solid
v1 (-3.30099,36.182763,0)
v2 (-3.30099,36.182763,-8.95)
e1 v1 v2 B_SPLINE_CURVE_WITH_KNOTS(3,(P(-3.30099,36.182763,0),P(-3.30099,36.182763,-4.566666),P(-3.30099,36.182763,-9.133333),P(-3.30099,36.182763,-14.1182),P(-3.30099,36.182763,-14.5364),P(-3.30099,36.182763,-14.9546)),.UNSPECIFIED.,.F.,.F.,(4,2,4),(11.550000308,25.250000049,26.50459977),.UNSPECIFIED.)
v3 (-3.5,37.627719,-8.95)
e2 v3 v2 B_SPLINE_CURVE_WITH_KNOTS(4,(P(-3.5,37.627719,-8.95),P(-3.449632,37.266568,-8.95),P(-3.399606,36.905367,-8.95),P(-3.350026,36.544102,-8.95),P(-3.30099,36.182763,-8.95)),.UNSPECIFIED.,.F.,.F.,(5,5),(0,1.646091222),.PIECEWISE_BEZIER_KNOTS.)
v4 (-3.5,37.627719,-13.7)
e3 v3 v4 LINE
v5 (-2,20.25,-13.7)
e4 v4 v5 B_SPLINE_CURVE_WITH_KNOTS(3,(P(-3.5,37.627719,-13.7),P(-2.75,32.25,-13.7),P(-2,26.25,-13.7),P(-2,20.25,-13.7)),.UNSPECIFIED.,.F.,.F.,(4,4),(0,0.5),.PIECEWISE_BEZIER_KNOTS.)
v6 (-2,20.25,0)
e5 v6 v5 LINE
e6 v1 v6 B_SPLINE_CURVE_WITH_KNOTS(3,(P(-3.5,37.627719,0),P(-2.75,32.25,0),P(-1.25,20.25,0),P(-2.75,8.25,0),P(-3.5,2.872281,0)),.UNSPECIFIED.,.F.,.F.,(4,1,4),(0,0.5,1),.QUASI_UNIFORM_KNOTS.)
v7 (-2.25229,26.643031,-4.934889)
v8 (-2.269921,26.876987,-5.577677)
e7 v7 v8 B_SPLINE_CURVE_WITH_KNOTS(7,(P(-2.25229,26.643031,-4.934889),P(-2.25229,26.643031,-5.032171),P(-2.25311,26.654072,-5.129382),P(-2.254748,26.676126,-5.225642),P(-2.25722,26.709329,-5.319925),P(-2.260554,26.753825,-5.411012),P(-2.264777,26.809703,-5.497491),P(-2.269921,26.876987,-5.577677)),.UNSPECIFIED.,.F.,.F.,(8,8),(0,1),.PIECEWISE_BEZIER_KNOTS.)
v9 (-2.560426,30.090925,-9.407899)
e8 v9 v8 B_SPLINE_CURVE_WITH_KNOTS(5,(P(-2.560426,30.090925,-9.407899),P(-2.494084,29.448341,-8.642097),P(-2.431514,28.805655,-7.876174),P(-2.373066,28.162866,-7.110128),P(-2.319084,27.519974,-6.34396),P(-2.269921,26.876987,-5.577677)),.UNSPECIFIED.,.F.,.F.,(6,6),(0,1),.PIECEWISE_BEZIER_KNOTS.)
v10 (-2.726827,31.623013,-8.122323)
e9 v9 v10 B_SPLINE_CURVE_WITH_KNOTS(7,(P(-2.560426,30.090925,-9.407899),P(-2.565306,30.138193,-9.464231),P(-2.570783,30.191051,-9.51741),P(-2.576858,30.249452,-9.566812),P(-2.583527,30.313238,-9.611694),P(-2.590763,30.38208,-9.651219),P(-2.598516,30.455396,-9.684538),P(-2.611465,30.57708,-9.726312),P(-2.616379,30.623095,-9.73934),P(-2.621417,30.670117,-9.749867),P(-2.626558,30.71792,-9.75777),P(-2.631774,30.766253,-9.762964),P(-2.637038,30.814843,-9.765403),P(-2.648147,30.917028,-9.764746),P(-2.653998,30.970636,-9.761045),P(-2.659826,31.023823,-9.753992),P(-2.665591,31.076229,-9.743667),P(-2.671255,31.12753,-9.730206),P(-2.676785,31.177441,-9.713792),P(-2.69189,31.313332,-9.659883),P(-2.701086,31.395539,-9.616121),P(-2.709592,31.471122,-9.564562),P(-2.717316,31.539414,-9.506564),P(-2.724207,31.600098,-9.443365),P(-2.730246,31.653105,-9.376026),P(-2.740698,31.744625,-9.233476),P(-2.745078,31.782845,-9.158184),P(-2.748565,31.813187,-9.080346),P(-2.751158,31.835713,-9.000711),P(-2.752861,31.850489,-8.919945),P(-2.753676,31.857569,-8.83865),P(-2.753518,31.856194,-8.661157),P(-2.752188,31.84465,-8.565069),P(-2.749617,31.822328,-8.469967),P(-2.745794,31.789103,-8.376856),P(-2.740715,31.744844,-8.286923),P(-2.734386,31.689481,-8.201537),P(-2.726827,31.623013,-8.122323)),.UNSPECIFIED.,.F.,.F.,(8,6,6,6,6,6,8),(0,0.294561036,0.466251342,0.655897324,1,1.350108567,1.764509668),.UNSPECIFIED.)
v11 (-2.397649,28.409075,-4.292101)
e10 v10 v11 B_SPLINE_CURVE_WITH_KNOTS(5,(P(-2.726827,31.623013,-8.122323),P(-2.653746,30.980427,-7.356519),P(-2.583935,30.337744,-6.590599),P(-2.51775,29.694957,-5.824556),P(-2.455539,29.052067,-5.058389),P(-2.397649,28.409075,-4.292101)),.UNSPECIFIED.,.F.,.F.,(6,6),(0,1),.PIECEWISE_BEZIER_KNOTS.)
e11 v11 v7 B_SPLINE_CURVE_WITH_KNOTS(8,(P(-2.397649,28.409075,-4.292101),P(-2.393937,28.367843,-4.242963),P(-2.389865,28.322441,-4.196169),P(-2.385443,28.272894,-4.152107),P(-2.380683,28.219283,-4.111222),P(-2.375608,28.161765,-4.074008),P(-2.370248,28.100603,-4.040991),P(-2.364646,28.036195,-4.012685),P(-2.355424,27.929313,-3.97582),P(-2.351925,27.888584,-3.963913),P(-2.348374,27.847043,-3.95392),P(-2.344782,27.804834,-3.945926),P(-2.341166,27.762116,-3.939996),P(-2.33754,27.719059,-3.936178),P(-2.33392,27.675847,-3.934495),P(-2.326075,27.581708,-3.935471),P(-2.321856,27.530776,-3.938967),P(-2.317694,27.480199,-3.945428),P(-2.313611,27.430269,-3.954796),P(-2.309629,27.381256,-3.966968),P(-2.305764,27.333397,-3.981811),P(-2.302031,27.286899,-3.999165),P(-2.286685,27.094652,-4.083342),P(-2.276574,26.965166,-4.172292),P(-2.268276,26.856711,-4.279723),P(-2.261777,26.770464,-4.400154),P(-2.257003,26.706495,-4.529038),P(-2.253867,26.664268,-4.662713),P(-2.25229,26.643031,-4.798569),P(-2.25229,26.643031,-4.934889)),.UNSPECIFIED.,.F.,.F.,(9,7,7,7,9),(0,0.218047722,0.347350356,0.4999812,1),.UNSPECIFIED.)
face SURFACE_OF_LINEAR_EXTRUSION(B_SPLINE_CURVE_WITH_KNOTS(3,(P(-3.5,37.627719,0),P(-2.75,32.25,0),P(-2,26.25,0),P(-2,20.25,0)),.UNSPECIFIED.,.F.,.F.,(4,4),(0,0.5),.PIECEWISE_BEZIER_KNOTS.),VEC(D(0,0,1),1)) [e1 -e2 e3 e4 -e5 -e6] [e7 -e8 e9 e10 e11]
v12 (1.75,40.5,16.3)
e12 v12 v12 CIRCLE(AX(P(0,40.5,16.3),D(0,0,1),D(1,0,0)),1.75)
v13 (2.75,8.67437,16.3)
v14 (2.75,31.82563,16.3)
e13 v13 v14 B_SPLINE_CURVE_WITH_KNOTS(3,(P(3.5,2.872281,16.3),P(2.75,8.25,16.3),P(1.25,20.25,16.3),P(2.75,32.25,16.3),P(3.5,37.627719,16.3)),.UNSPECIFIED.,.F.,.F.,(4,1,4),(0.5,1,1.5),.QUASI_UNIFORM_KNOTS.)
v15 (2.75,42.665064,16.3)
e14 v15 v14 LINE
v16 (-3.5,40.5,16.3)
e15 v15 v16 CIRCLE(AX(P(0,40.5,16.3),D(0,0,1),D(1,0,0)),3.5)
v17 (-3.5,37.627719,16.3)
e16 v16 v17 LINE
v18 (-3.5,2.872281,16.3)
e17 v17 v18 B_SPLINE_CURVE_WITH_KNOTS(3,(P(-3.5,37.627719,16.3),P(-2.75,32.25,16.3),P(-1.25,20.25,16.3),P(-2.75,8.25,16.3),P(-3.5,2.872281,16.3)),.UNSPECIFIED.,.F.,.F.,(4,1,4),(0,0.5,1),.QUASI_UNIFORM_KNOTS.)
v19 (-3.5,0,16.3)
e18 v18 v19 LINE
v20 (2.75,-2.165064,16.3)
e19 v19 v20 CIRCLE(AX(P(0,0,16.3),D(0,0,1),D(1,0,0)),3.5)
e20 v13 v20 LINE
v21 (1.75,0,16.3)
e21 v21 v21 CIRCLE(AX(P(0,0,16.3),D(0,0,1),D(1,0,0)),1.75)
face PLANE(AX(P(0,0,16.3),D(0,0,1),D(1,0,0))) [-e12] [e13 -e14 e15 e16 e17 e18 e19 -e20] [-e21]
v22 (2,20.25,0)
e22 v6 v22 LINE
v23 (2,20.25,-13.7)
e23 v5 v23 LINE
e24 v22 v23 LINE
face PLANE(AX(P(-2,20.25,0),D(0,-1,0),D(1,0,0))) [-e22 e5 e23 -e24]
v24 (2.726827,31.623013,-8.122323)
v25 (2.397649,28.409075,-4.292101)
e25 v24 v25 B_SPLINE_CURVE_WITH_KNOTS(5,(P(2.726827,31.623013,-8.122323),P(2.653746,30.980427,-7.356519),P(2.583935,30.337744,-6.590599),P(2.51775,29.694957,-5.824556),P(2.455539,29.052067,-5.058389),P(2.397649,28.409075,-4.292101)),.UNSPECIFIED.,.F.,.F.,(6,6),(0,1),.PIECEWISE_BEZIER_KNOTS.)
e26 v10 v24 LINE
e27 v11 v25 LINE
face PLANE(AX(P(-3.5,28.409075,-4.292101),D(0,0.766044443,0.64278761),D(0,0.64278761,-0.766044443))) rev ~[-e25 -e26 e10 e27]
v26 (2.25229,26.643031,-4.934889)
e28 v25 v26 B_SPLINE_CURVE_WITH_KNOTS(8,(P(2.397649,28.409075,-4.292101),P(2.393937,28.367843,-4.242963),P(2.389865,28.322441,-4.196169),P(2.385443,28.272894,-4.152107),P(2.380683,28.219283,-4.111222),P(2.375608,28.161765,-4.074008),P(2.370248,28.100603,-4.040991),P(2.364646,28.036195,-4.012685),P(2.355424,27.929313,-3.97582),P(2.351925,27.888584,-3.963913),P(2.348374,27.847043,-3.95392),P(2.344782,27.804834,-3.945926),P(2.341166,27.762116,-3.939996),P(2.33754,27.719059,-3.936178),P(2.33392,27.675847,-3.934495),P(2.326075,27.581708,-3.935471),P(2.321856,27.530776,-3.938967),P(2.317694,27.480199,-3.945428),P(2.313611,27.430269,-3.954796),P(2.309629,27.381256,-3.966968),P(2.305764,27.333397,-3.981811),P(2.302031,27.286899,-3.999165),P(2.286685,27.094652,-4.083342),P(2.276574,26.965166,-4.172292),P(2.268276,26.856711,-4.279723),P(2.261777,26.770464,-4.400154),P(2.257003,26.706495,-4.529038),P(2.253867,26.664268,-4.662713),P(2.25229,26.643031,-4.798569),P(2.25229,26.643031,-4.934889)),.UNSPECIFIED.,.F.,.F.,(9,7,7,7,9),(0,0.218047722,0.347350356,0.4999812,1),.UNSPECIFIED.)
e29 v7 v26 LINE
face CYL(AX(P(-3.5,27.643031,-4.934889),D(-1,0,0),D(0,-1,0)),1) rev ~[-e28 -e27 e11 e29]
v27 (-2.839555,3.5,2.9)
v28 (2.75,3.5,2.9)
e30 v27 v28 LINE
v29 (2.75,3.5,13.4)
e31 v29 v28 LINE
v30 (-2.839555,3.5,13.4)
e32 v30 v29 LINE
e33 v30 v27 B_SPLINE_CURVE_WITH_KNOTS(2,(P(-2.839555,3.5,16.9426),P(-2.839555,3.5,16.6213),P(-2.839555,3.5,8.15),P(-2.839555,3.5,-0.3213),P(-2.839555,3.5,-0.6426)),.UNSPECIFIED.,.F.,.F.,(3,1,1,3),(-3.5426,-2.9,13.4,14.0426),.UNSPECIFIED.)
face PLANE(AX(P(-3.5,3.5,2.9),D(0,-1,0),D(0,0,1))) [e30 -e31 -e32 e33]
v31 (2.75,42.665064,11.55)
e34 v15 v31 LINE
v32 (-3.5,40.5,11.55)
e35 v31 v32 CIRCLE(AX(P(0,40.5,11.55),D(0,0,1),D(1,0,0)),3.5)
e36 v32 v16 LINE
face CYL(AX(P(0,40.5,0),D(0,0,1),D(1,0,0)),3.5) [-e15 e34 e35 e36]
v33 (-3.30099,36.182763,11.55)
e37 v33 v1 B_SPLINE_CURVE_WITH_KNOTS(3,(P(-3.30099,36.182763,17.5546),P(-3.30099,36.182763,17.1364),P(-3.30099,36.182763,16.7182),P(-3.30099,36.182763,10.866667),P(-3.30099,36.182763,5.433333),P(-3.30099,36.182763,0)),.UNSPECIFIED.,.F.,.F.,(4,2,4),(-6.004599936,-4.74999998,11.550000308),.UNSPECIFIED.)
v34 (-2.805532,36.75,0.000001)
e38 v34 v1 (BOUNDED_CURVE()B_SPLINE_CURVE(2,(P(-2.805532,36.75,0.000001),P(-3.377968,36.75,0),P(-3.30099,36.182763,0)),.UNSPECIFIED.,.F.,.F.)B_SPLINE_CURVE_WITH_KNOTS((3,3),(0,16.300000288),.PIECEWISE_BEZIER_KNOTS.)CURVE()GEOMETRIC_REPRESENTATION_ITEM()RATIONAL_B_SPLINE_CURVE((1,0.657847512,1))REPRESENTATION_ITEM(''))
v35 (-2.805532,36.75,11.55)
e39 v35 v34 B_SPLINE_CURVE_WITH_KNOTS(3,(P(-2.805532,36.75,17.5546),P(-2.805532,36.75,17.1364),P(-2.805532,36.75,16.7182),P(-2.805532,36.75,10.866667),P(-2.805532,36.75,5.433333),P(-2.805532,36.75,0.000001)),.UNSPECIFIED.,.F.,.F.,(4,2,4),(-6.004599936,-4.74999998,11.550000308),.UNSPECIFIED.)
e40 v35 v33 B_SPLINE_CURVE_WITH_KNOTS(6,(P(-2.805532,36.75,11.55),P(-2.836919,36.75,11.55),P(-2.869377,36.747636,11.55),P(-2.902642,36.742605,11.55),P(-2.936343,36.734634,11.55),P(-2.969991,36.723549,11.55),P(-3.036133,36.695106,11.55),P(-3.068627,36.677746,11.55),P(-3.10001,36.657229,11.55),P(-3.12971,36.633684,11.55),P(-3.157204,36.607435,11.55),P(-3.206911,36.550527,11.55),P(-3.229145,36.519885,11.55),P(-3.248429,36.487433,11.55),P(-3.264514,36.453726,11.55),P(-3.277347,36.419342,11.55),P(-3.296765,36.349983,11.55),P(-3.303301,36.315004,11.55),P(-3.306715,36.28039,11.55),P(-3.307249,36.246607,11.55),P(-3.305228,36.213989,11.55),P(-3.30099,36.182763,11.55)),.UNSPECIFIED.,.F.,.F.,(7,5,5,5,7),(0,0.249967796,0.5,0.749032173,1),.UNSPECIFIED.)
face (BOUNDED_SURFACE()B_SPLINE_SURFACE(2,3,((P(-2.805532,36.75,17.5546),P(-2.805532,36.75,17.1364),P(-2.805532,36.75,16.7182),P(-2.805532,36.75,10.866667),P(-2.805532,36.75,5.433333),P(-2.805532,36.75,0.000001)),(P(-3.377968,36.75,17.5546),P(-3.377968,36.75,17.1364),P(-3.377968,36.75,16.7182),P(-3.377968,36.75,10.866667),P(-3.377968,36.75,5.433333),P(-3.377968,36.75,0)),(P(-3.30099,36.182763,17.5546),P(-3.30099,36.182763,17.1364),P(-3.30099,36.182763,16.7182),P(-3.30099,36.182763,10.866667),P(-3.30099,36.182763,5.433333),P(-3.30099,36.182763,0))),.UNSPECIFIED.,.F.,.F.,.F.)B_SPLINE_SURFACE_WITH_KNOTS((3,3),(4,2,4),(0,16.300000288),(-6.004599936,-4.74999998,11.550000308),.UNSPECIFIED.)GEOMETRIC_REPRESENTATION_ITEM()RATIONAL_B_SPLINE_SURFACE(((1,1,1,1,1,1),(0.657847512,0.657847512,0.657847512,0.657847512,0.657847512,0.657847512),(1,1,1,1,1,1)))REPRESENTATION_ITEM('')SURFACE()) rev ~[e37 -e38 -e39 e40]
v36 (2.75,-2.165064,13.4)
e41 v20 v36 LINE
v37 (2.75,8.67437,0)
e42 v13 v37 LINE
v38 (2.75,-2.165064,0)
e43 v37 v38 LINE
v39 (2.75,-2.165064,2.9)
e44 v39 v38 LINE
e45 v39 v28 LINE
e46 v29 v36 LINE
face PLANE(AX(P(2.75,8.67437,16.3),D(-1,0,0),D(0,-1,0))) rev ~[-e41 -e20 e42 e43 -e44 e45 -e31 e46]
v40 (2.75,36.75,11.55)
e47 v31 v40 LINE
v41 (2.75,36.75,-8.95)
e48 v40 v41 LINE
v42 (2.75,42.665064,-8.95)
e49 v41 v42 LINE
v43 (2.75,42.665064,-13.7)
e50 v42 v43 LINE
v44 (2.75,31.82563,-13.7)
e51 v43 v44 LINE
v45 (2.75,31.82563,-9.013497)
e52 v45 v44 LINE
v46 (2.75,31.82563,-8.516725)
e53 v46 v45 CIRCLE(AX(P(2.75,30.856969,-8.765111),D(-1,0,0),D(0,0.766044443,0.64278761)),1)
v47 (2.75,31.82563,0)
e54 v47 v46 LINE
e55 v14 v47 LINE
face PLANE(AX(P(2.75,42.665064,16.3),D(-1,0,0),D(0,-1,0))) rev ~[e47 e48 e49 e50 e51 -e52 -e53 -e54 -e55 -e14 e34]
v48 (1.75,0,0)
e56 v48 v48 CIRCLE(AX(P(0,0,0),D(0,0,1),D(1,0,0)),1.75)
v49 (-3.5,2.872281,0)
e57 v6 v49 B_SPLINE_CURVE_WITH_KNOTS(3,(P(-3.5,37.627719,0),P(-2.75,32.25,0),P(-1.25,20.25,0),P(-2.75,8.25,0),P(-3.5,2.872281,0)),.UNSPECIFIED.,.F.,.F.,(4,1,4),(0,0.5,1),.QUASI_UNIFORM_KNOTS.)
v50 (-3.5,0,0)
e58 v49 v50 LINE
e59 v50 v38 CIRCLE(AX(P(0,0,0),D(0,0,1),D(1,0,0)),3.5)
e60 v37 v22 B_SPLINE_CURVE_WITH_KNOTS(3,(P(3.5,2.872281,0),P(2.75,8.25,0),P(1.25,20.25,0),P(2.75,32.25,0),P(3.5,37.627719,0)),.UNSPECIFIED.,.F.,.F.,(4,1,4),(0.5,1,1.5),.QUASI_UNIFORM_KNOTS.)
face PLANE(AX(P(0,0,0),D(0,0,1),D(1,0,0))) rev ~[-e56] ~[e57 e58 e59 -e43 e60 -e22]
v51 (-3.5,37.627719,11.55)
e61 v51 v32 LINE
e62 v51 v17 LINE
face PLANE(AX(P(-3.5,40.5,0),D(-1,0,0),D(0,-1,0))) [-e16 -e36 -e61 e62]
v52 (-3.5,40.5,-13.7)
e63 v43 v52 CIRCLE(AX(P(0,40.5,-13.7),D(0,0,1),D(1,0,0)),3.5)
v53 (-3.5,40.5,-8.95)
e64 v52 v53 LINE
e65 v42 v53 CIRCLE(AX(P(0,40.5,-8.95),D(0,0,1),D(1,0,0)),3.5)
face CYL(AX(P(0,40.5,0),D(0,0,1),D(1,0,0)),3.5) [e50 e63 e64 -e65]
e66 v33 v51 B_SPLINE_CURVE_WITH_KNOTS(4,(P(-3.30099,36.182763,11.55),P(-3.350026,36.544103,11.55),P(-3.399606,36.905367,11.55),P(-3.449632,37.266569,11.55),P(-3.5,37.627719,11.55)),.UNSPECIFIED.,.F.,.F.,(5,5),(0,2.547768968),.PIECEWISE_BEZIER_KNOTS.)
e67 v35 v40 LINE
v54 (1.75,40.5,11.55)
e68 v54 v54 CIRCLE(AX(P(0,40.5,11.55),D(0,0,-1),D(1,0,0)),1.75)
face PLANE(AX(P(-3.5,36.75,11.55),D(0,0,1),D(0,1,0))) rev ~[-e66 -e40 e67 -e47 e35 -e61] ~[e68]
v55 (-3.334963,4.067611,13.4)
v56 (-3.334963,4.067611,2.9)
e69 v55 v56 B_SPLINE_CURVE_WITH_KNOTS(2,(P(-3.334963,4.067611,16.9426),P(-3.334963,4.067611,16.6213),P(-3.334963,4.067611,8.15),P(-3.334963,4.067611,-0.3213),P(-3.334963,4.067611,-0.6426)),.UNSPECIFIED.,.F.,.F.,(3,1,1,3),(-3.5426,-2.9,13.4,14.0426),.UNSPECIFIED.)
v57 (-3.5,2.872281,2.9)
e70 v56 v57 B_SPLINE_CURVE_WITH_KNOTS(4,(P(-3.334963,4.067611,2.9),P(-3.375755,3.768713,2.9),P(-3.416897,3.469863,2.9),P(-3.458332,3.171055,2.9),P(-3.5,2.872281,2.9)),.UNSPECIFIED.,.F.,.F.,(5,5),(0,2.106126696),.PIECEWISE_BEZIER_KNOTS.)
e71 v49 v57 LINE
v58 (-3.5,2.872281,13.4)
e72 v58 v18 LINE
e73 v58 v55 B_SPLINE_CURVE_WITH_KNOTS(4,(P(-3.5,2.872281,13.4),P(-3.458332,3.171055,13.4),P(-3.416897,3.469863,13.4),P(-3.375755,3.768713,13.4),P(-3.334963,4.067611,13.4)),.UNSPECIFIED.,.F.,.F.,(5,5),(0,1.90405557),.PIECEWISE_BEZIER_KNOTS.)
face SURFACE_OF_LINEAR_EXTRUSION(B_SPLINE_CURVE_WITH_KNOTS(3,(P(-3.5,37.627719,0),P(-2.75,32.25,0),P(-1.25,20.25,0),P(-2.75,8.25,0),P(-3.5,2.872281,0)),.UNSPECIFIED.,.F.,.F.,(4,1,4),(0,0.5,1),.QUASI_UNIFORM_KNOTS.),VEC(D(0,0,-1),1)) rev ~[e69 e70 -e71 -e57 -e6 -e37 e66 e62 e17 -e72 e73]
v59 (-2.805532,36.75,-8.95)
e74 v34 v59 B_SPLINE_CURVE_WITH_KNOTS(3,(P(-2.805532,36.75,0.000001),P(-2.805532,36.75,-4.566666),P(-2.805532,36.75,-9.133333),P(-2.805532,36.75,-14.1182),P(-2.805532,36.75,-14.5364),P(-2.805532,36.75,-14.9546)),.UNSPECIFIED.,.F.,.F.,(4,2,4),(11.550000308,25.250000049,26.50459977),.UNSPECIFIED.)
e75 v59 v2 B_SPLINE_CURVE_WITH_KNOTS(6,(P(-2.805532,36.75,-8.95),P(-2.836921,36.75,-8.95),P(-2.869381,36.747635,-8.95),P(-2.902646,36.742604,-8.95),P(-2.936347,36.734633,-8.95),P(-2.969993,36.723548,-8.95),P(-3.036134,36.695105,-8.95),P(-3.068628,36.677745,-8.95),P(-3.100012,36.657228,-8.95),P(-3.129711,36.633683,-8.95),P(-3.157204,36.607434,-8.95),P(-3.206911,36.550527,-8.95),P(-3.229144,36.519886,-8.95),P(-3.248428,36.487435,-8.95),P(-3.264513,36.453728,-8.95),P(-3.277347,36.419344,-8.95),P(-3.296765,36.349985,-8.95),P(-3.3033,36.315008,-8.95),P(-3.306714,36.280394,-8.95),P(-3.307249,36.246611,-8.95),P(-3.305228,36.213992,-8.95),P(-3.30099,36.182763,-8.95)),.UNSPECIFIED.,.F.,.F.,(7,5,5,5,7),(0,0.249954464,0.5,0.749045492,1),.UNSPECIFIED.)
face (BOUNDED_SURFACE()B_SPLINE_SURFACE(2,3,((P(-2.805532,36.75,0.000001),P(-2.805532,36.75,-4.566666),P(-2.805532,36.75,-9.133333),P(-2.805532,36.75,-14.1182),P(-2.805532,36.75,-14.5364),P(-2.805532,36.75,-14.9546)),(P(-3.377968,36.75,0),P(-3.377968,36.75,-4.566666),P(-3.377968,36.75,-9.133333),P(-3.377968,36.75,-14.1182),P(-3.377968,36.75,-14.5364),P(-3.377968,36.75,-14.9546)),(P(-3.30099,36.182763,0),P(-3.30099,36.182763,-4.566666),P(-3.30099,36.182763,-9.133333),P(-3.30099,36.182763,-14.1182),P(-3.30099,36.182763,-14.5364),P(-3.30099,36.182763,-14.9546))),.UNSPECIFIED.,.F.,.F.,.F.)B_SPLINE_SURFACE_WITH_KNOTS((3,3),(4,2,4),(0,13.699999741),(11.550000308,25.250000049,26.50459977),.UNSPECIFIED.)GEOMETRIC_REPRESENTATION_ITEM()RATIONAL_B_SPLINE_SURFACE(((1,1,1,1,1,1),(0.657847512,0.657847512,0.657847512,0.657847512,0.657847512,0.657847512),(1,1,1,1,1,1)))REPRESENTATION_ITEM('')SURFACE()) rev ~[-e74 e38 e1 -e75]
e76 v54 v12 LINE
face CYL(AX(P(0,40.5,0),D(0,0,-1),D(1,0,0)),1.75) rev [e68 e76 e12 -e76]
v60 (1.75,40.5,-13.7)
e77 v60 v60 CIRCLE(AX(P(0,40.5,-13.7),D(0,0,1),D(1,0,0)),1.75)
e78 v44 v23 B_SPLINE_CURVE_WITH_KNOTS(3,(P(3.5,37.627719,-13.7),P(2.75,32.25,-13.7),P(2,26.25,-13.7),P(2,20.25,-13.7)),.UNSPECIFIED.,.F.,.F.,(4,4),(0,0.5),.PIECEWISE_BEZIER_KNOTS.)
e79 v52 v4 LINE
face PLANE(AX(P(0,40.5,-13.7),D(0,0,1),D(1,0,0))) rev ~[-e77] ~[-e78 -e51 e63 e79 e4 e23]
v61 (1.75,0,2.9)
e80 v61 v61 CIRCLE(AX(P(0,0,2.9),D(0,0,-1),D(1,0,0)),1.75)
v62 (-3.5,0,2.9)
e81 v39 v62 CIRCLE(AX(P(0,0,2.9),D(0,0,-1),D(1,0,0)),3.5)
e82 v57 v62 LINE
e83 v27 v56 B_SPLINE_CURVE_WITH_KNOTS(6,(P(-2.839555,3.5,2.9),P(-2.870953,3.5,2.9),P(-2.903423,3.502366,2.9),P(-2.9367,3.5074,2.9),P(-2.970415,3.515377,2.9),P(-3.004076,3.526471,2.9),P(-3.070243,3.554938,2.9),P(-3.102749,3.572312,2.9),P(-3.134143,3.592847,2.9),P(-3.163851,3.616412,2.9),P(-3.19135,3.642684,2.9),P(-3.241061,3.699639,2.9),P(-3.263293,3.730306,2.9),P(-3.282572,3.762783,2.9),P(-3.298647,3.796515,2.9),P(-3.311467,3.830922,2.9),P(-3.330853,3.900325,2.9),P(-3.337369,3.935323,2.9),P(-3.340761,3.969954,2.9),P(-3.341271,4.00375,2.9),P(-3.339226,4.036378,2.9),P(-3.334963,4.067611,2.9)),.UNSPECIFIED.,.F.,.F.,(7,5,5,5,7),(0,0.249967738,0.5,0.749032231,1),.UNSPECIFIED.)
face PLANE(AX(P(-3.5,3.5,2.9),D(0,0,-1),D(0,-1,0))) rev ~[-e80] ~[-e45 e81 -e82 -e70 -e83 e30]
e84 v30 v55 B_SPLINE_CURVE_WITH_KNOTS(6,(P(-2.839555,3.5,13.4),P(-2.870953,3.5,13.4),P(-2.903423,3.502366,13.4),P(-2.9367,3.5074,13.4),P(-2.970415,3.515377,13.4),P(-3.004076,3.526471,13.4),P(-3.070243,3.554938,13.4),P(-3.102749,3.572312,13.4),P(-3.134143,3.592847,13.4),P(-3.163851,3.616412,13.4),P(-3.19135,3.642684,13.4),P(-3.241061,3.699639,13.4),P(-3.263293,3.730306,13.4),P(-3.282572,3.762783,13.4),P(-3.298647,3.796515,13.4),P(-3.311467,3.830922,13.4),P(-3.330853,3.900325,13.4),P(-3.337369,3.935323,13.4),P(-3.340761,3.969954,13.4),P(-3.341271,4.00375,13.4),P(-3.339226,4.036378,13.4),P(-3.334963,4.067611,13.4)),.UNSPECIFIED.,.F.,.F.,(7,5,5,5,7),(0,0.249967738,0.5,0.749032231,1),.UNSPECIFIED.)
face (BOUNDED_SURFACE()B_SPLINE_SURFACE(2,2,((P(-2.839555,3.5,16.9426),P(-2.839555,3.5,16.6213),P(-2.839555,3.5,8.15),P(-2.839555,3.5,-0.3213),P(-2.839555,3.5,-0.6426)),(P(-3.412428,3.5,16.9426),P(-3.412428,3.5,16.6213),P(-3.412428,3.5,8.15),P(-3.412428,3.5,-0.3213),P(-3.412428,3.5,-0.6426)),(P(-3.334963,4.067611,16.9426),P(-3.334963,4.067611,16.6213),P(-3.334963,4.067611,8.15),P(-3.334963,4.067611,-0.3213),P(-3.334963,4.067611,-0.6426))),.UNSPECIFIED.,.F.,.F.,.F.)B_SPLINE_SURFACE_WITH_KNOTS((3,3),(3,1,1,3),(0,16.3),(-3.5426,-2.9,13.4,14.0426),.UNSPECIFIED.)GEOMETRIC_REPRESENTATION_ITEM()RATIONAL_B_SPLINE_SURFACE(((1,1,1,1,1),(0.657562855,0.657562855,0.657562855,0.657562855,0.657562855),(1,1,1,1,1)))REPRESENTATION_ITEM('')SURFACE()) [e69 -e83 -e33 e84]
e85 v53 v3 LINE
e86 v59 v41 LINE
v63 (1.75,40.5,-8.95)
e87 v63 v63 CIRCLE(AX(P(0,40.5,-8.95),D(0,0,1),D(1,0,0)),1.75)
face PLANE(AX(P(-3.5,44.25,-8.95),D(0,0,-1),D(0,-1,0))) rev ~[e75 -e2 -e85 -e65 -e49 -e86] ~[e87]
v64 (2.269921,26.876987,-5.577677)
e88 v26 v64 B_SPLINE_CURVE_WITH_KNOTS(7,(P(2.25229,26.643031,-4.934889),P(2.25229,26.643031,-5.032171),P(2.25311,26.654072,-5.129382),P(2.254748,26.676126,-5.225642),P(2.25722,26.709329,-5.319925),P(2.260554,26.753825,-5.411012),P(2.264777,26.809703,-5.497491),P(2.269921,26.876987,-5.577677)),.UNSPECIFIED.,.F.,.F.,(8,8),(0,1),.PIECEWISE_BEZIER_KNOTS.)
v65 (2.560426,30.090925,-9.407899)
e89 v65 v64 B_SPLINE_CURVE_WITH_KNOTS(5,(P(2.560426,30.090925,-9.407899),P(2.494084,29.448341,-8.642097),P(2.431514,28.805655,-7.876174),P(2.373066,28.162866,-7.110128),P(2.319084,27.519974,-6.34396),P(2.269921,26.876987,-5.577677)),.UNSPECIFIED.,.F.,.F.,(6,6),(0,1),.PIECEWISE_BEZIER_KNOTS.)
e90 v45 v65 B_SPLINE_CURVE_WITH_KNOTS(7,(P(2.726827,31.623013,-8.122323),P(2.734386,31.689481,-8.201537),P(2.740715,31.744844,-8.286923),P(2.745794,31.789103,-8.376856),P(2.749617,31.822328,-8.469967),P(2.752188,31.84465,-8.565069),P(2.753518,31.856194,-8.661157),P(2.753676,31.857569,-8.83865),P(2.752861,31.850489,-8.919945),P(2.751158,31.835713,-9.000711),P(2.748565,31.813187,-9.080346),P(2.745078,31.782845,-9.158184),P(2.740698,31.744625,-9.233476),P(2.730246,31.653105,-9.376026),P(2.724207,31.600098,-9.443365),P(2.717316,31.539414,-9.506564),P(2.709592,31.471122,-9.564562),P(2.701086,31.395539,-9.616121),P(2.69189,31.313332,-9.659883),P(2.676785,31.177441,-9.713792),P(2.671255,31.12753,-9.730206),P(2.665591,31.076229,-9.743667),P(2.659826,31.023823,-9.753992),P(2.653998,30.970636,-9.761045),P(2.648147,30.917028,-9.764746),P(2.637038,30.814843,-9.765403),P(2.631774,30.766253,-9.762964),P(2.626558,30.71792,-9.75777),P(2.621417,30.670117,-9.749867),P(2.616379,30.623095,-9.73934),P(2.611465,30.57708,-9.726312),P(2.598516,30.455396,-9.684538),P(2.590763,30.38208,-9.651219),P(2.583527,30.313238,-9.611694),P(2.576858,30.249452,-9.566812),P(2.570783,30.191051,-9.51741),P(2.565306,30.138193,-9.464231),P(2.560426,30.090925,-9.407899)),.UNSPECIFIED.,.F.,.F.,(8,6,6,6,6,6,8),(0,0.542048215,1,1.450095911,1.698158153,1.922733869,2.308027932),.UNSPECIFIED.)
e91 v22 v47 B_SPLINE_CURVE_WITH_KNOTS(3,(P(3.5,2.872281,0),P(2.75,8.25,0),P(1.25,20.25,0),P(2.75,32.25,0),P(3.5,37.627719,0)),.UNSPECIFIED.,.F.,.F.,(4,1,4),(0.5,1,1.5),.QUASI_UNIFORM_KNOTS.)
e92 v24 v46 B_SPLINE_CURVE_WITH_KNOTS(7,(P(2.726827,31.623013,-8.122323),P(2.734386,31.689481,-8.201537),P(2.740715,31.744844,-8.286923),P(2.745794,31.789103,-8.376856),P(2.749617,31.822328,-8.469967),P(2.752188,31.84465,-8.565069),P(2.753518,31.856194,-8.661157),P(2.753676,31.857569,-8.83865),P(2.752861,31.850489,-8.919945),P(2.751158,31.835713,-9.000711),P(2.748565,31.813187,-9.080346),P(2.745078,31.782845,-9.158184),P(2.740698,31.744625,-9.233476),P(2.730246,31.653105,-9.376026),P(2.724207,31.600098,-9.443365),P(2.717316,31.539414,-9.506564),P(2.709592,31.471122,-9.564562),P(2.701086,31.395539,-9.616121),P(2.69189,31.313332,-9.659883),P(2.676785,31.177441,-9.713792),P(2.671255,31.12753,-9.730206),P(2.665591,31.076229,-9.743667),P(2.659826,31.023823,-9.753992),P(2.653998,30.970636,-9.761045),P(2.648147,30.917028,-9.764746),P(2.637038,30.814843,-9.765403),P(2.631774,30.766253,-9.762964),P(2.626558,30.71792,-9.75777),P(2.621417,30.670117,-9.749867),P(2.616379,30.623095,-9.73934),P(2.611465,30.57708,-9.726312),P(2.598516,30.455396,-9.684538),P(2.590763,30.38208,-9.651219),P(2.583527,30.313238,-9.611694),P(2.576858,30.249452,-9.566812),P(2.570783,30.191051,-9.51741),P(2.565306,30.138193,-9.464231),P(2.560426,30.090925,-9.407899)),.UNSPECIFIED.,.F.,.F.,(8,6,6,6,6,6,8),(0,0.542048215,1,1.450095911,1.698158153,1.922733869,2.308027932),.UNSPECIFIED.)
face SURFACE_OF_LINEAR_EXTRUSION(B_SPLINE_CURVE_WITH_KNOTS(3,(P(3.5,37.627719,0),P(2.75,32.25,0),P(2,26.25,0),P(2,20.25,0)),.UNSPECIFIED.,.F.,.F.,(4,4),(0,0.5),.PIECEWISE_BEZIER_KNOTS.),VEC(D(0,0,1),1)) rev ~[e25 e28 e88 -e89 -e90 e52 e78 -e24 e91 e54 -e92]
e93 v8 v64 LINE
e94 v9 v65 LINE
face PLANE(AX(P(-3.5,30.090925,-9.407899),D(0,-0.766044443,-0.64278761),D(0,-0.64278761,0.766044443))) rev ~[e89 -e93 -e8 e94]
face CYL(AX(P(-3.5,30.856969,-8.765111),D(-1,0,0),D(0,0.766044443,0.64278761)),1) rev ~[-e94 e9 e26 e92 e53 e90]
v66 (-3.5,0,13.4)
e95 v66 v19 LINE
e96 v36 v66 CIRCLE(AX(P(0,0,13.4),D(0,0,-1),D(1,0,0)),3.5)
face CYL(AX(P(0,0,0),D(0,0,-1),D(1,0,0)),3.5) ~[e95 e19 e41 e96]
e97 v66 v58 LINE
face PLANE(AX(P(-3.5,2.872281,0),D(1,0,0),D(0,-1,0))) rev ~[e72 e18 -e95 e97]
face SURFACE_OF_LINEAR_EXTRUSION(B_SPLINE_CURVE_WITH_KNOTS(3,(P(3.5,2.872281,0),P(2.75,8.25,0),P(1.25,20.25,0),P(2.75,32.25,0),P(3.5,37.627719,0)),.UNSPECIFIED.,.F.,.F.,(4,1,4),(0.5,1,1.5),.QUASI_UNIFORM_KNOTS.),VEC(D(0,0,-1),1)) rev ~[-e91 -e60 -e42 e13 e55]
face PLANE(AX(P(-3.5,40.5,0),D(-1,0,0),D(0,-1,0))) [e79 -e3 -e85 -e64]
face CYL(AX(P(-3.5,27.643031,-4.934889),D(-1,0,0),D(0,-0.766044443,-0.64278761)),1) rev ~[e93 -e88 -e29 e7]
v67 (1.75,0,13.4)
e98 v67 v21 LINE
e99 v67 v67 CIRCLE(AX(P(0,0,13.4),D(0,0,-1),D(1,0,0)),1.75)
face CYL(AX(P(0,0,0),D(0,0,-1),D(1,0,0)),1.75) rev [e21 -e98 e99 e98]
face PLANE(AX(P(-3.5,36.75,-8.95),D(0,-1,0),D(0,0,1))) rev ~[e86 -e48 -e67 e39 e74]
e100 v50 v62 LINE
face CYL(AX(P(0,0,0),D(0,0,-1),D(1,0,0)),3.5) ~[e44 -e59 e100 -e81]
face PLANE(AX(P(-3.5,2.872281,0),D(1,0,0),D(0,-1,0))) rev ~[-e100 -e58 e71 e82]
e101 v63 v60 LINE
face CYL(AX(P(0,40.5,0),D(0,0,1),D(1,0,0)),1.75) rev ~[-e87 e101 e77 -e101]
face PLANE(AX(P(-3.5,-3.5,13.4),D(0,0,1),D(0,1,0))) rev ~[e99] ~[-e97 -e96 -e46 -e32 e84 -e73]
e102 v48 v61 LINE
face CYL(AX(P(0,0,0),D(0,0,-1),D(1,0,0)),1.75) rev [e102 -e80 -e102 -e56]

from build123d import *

# Parameters (mm, degrees)
F0_R     = 1.75
F1_DEPTH = 16.3
F2_W     = 0.6277186767
F2_H     = 10.5
F2_W_2   = 2.8722813233
F2_W_3   = 3.5
F3_DEPTH = 25
F4_DEPTH = 13.7
F5_W     = 3.75
F5_H     = 20.5
F6_DEPTH = 25
F7_R     = 0.5
F9_DEPTH = 44


# Not quite as in the source:
# - a feature names something its author has since deleted; it is built from what else it names


with BuildPart() as f1:
    # F0 (on Top) → F1 (new body)
    with BuildSketch(Plane.XY):
        with BuildLine():
            ThreePointArc((-3.5, 0), (0, -3.5), (3.5, 0))
            ThreePointArc((3.5, 0), (0, 3.5), (-3.5, 0))
        make_face()
        Circle(F0_R, mode=Mode.SUBTRACT)
        with BuildLine():
            ThreePointArc((-3.5, 40.5), (0, 37), (3.5, 40.5))
            ThreePointArc((3.5, 40.5), (0, 44), (-3.5, 40.5))
        make_face()
        with Locations((0, 40.5)):
            Circle(F0_R, mode=Mode.SUBTRACT)
        with BuildLine():
            Line((-2, 20.25), (2, 20.25))
            add(Edge.make_bspline(
                [(3.5, 37.6277186767), (2.75, 32.25), (2, 26.25), (2, 20.25)],
                knots=[0, 0, 0, 0, 0.5, 0.5, 0.5, 0.5], degree=3))
            Line((3.5, 37.6277186767), (3.5, 40.5))
            ThreePointArc((3.5, 40.5), (0, 37), (-3.5, 40.5))
            Line((-3.5, 40.5), (-3.5, 37.6277186767))
            add(Edge.make_bspline(
                [(-3.5, 37.6277186767), (-2.75, 32.25), (-2, 26.25), (-2, 20.25)],
                knots=[0, 0, 0, 0, 0.5, 0.5, 0.5, 0.5], degree=3))
        make_face()
        with BuildLine():
            ThreePointArc((-3.5, 0), (0, 3.5), (3.5, 0))
            Line((3.5, 0), (3.5, 2.8722813233))
            add(Edge.make_bspline(
                [(2, 20.25), (2, 14.25), (2.75, 8.25), (3.5, 2.8722813233)],
                knots=[0.5, 0.5, 0.5, 0.5, 1, 1, 1, 1], degree=3))
            Line((2, 20.25), (-2, 20.25))
            add(Edge.make_bspline(
                [(-2, 20.25), (-2, 14.25), (-2.75, 8.25), (-3.5, 2.8722813233)],
                knots=[0.5, 0.5, 0.5, 0.5, 1, 1, 1, 1], degree=3))
            Line((-3.5, 2.8722813233), (-3.5, 0))
        make_face()
    extrude(amount=F1_DEPTH)

    # F2 (on face) → F3 (cut)
    with BuildSketch(Plane(origin=(-3.5, 0, 0), x_dir=(0, -1, 0), z_dir=(-1, 0, 0))):
        with Locations((-3.1861406616, 8.15)):
            Rectangle(F2_W, F2_H)
        with Locations((-1.4361406616, 8.15)):
            Rectangle(F2_W_2, F2_H)
        with Locations((1.75, 8.15)):
            Rectangle(F2_W_3, F2_H)
    extrude(amount=-F3_DEPTH, mode=Mode.SUBTRACT)

    # F0 (on Top) → F4 (join)
    with BuildSketch(Plane.XY):
        with BuildLine():
            ThreePointArc((-3.5, 40.5), (0, 37), (3.5, 40.5))
            ThreePointArc((3.5, 40.5), (0, 44), (-3.5, 40.5))
        make_face()
        with Locations((0, 40.5)):
            Circle(F0_R, mode=Mode.SUBTRACT)
        with BuildLine():
            Line((-2, 20.25), (2, 20.25))
            add(Edge.make_bspline(
                [(3.5, 37.6277186767), (2.75, 32.25), (2, 26.25), (2, 20.25)],
                knots=[0, 0, 0, 0, 0.5, 0.5, 0.5, 0.5], degree=3))
            Line((3.5, 37.6277186767), (3.5, 40.5))
            ThreePointArc((3.5, 40.5), (0, 37), (-3.5, 40.5))
            Line((-3.5, 40.5), (-3.5, 37.6277186767))
            add(Edge.make_bspline(
                [(-3.5, 37.6277186767), (-2.75, 32.25), (-2, 26.25), (-2, 20.25)],
                knots=[0, 0, 0, 0, 0.5, 0.5, 0.5, 0.5], degree=3))
        make_face()
    extrude(amount=-F4_DEPTH)

    # F5 (on face) → F6 (cut)
    with BuildSketch(Plane(origin=(-3.5, 0, 0), x_dir=(0, -1, 0), z_dir=(-1, 0, 0))):
        with Locations((-42.375, 1.3)):
            Rectangle(F5_W, F5_H)
        Polygon((-37.6277186767, 0), (-37.6277186767, 11.55), (-40.5, 11.55), (-40.5, -8.95), (-37.6277186767, -8.95), align=None)
        Polygon((-36.75, -8.95), (-36.75, 11.55), (-37.6277186767, 11.55), (-37.6277186767, 0), (-37.6277186767, -8.95), align=None)
        with BuildLine():
            ThreePointArc((-30.0909245811, -9.4078987175), (-29.9172764034, -9.1071312511), (-29.8569690242, -8.7651111078))
            ThreePointArc((-29.8569690242, -8.7651111078), (-30.5149488809, -7.825418487), (-31.6230134673, -8.1223234981))
            ThreePointArc((-31.6230134673, -8.1223234981), (-31.4997566339, -9.5311555509), (-30.0909245811, -9.4078987175))
        make_face()
        with BuildLine():
            ThreePointArc((-31.6230134673, -8.1223234981), (-30.5149488809, -7.825418487), (-29.8569690242, -8.7651111078))
            ThreePointArc((-29.8569690242, -8.7651111078), (-29.9172764034, -9.1071312511), (-30.0909245811, -9.4078987175))
            Line((-30.0909245811, -9.4078987175), (-26.8769865327, -5.5776765019))
            ThreePointArc((-26.8769865327, -5.5776765019), (-28.2858185855, -5.7009333353), (-28.4090754189, -4.2921012825))
            Line((-28.4090754189, -4.2921012825), (-31.6230134673, -8.1223234981))
        make_face()
        with BuildLine():
            ThreePointArc((-26.6430309758, -4.9348888922), (-27.3010108325, -3.9951962714), (-28.4090754189, -4.2921012825))
            ThreePointArc((-28.4090754189, -4.2921012825), (-28.2858185855, -5.7009333353), (-26.8769865327, -5.5776765019))
            ThreePointArc((-26.8769865327, -5.5776765019), (-26.703338355, -5.2769090355), (-26.6430309758, -4.9348888922))
        make_face()
    extrude(amount=-F6_DEPTH, mode=Mode.SUBTRACT)

    # F7
    f7_edges = [f1.edges().sort_by_distance(p)[0] for p in [
        (-3.412885, 3.5, 8.15),
        (3.412885, 3.5, 8.15),
        (3.378456, 36.75, 5.775),
        (3.378456, 36.75, -4.475),
        (-3.378456, 36.75, 5.775),
        (-3.378456, 36.75, -4.475),
    ]]
    fillet(f7_edges, radius=F7_R)

    # F8 (on face) → F9 (cut)
    with BuildSketch(Plane.XY.offset(16.3)):
        with BuildLine():
            ThreePointArc((3.5, 40.5), (3.3071891388, 41.6456439237), (2.75, 42.6650635095))
            Line((2.75, 42.6650635095), (2.75, 31.8256302364))
            add(Edge.make_bspline(
                [(2.75, 31.8256302364), (2.979055467, 33.8173381724), (3.2395277335, 35.7600565803), (3.5, 37.6277186767)],
                knots=[1.3263518223, 1.3263518223, 1.3263518223, 1.3263518223, 1.5, 1.5, 1.5, 1.5], degree=3))
            Line((3.5, 37.6277186767), (3.5, 40.5))
        make_face()
        with BuildLine():
            add(Edge.make_bspline(
                [(3.5, 2.8722813233), (3.2395277335, 4.7399434197), (2.979055467, 6.6826618276), (2.75, 8.6743697636)],
                knots=[0.5, 0.5, 0.5, 0.5, 0.6736481777, 0.6736481777, 0.6736481777, 0.6736481777], degree=3))
            Line((2.75, 8.6743697636), (2.75, -2.1650635095))
            ThreePointArc((2.75, -2.1650635095), (3.3071891388, -1.1456439237), (3.5, 0))
            Line((3.5, 0), (3.5, 2.8722813233))
        make_face()
    extrude(amount=-F9_DEPTH, mode=Mode.SUBTRACT)


solid = f1.part
